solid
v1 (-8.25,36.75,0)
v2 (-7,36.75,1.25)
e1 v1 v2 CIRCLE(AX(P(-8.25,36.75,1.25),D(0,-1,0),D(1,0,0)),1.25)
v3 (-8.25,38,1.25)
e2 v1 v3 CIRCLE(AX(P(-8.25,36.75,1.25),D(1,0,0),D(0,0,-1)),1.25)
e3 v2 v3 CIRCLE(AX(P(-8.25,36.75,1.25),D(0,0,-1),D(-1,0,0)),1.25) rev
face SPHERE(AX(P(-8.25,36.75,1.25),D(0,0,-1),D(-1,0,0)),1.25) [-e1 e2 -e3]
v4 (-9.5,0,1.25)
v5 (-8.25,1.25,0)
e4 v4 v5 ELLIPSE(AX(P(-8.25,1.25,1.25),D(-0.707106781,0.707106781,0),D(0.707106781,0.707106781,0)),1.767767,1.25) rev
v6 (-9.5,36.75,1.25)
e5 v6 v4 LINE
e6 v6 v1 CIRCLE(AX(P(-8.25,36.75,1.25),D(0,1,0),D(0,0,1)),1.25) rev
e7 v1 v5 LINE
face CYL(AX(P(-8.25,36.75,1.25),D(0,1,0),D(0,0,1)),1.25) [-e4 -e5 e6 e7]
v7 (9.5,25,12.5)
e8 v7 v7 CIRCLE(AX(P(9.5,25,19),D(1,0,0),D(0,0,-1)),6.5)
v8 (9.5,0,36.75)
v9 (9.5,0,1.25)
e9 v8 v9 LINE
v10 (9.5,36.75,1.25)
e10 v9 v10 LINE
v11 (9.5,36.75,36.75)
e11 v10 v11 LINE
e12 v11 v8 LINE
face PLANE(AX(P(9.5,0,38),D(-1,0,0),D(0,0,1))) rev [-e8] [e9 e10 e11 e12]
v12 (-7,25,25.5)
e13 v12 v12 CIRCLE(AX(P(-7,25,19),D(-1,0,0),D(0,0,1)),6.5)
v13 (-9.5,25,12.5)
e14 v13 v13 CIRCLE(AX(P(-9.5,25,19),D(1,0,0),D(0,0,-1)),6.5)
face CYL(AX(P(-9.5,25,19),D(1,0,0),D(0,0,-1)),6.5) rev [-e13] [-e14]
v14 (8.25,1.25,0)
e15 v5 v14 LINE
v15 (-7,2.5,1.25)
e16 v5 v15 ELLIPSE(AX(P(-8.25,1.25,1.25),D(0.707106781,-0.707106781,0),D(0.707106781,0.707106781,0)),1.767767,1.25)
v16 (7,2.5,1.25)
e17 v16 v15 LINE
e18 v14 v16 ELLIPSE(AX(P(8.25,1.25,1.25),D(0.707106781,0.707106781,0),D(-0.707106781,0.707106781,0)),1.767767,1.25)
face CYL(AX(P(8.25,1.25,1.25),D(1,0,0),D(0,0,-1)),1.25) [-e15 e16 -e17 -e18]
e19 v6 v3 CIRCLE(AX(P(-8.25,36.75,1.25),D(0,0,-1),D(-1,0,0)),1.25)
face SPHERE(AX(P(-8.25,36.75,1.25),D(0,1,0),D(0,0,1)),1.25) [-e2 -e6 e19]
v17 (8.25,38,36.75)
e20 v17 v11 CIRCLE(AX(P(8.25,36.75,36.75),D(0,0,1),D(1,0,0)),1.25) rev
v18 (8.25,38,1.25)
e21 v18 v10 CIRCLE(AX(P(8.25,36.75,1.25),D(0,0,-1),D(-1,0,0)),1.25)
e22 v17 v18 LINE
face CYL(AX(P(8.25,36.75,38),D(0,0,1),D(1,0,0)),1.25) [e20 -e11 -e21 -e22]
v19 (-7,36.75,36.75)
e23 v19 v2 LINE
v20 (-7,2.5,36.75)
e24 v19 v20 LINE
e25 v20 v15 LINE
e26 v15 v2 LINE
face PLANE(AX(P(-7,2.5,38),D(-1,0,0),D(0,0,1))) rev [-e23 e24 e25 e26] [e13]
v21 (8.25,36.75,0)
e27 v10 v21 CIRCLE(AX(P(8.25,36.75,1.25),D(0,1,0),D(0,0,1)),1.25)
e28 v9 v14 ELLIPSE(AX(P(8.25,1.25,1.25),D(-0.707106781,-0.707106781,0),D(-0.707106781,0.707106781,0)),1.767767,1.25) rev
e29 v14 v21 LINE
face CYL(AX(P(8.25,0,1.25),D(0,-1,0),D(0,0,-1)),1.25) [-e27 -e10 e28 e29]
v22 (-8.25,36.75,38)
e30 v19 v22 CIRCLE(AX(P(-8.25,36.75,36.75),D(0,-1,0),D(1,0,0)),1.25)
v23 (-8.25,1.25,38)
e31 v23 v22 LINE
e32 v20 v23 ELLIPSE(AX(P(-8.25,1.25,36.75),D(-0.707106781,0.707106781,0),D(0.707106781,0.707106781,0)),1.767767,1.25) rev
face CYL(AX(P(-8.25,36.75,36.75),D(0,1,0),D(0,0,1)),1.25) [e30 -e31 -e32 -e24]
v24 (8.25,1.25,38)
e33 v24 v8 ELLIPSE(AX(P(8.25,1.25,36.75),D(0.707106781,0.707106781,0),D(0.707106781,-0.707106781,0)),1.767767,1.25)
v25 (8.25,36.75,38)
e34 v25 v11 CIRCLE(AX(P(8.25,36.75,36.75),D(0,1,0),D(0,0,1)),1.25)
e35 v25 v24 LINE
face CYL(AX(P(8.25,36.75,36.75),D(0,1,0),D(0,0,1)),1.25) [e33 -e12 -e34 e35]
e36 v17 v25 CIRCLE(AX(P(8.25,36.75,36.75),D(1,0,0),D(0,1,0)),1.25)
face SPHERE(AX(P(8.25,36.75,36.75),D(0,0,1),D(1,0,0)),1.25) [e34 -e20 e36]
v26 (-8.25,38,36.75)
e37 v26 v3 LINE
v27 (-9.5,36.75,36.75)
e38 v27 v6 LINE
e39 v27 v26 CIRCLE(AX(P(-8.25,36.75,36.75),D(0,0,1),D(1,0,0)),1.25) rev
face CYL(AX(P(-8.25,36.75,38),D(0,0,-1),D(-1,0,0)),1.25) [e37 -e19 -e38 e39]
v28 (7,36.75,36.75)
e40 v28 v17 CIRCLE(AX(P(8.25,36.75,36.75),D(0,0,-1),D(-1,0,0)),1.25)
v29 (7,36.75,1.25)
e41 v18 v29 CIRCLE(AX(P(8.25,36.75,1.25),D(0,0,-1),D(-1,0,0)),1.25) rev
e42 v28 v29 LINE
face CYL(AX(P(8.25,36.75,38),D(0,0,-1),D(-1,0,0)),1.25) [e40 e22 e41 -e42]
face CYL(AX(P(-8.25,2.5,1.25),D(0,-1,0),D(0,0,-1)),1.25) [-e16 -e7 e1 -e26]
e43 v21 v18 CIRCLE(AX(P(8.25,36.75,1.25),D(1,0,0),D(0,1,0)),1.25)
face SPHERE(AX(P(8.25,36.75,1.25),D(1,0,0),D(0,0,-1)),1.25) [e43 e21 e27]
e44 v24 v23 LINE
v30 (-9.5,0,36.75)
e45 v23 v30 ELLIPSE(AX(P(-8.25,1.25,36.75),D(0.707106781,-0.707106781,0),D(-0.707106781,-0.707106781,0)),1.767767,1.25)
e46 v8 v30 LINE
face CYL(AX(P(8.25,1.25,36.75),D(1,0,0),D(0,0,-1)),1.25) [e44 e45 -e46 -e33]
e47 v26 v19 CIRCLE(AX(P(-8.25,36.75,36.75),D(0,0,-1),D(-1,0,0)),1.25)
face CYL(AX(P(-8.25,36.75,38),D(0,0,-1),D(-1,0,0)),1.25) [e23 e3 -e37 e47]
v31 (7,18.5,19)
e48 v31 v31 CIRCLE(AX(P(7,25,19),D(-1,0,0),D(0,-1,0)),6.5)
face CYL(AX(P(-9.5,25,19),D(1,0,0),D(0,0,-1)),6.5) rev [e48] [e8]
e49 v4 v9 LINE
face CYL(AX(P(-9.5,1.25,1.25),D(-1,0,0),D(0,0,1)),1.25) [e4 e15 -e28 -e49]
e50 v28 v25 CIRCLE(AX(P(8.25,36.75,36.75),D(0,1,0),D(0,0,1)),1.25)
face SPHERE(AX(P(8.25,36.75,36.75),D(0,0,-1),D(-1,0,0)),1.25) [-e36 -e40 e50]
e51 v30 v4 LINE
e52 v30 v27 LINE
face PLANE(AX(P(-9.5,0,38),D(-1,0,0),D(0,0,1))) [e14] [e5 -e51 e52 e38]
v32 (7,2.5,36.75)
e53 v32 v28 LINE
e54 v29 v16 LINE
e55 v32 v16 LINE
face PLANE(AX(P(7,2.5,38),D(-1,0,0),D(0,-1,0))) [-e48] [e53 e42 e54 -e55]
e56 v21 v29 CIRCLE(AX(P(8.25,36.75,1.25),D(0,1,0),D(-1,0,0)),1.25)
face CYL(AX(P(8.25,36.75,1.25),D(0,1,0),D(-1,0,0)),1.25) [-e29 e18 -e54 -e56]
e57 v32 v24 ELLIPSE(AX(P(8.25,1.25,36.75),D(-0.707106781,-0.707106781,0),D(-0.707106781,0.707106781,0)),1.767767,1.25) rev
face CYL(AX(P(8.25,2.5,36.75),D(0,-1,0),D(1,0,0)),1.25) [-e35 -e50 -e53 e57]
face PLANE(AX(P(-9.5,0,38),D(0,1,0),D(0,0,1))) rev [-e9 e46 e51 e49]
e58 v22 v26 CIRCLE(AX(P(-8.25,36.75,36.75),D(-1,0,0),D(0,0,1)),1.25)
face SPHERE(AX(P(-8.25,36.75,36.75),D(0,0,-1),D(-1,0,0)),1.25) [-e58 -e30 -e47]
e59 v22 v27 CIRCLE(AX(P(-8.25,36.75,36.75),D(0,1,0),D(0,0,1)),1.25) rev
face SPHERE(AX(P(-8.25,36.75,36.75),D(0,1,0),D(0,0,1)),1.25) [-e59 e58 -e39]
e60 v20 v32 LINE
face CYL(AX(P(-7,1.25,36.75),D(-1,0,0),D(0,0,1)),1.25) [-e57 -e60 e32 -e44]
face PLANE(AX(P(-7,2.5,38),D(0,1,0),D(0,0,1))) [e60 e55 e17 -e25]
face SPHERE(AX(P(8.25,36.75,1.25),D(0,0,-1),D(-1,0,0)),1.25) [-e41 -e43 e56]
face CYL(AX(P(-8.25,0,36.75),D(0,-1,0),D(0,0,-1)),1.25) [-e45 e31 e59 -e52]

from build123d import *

# Parameters (mm, degrees)
BOSS_EXTRUDE1_DEPTH = 38
SKETCH2_R           = 6.5
CUT_EXTRUDE1_DEPTH  = 58
FILLET1_R           = 1.25


with BuildPart() as part:
    # Sketch1 → Boss-Extrude1 (new body)
    with BuildSketch(Plane.XY):
        with BuildLine():
            Line((-9.5, 0), (9.5, 0))
            Line((9.5, 0), (9.5, 38))
            Line((9.5, 38), (8.25, 38))
            ThreePointArc((8.25, 38), (7.366116524, 37.633883476), (7, 36.75))
            Line((7, 36.75), (7, 2.5))
            Line((7, 2.5), (-7, 2.5))
            Line((-7, 2.5), (-7, 36.75))
            ThreePointArc((-7, 36.75), (-7.366116524, 37.633883476), (-8.25, 38))
            Line((-8.25, 38), (-9.5, 38))
            Line((-9.5, 38), (-9.5, 0))
        make_face()
    extrude(amount=BOSS_EXTRUDE1_DEPTH)

    # Sketch2 → Cut-Extrude1 (cut, through all)
    with BuildSketch(Plane(origin=(9.5, 0, 0), x_dir=(0, 0, -1), z_dir=(1, 0, 0))):
        with Locations((-19, 25)):
            Circle(SKETCH2_R)
    extrude(amount=-CUT_EXTRUDE1_DEPTH, mode=Mode.SUBTRACT)

    # Fillet1
    fillet1_edges = [part.edges().sort_by_distance(p)[0] for p in [
        (7.366116524, 37.633883476, 0),
        (-7.366116524, 37.633883476, 0),
        (9.5, 19, 38),
        (0, 0, 38),
        (-9.5, 19, 38),
        (-7.366116524, 37.633883476, 38),
        (-7, 19.625, 38),
        (0, 2.5, 38),
        (7, 19.625, 38),
        (7.366116524, 37.633883476, 38),
        (7, 19.625, 0),
        (9.5, 19, 0),
        (0, 0, 0),
        (0, 2.5, 0),
        (-7, 19.625, 0),
        (-9.5, 19, 0),
        (-9.5, 38, 19),
        (9.5, 38, 19),
    ]]
    fillet(fillet1_edges, radius=FILLET1_R - 0.0001)  # a hair under: the kernel refuses the full size


solid = part.part
